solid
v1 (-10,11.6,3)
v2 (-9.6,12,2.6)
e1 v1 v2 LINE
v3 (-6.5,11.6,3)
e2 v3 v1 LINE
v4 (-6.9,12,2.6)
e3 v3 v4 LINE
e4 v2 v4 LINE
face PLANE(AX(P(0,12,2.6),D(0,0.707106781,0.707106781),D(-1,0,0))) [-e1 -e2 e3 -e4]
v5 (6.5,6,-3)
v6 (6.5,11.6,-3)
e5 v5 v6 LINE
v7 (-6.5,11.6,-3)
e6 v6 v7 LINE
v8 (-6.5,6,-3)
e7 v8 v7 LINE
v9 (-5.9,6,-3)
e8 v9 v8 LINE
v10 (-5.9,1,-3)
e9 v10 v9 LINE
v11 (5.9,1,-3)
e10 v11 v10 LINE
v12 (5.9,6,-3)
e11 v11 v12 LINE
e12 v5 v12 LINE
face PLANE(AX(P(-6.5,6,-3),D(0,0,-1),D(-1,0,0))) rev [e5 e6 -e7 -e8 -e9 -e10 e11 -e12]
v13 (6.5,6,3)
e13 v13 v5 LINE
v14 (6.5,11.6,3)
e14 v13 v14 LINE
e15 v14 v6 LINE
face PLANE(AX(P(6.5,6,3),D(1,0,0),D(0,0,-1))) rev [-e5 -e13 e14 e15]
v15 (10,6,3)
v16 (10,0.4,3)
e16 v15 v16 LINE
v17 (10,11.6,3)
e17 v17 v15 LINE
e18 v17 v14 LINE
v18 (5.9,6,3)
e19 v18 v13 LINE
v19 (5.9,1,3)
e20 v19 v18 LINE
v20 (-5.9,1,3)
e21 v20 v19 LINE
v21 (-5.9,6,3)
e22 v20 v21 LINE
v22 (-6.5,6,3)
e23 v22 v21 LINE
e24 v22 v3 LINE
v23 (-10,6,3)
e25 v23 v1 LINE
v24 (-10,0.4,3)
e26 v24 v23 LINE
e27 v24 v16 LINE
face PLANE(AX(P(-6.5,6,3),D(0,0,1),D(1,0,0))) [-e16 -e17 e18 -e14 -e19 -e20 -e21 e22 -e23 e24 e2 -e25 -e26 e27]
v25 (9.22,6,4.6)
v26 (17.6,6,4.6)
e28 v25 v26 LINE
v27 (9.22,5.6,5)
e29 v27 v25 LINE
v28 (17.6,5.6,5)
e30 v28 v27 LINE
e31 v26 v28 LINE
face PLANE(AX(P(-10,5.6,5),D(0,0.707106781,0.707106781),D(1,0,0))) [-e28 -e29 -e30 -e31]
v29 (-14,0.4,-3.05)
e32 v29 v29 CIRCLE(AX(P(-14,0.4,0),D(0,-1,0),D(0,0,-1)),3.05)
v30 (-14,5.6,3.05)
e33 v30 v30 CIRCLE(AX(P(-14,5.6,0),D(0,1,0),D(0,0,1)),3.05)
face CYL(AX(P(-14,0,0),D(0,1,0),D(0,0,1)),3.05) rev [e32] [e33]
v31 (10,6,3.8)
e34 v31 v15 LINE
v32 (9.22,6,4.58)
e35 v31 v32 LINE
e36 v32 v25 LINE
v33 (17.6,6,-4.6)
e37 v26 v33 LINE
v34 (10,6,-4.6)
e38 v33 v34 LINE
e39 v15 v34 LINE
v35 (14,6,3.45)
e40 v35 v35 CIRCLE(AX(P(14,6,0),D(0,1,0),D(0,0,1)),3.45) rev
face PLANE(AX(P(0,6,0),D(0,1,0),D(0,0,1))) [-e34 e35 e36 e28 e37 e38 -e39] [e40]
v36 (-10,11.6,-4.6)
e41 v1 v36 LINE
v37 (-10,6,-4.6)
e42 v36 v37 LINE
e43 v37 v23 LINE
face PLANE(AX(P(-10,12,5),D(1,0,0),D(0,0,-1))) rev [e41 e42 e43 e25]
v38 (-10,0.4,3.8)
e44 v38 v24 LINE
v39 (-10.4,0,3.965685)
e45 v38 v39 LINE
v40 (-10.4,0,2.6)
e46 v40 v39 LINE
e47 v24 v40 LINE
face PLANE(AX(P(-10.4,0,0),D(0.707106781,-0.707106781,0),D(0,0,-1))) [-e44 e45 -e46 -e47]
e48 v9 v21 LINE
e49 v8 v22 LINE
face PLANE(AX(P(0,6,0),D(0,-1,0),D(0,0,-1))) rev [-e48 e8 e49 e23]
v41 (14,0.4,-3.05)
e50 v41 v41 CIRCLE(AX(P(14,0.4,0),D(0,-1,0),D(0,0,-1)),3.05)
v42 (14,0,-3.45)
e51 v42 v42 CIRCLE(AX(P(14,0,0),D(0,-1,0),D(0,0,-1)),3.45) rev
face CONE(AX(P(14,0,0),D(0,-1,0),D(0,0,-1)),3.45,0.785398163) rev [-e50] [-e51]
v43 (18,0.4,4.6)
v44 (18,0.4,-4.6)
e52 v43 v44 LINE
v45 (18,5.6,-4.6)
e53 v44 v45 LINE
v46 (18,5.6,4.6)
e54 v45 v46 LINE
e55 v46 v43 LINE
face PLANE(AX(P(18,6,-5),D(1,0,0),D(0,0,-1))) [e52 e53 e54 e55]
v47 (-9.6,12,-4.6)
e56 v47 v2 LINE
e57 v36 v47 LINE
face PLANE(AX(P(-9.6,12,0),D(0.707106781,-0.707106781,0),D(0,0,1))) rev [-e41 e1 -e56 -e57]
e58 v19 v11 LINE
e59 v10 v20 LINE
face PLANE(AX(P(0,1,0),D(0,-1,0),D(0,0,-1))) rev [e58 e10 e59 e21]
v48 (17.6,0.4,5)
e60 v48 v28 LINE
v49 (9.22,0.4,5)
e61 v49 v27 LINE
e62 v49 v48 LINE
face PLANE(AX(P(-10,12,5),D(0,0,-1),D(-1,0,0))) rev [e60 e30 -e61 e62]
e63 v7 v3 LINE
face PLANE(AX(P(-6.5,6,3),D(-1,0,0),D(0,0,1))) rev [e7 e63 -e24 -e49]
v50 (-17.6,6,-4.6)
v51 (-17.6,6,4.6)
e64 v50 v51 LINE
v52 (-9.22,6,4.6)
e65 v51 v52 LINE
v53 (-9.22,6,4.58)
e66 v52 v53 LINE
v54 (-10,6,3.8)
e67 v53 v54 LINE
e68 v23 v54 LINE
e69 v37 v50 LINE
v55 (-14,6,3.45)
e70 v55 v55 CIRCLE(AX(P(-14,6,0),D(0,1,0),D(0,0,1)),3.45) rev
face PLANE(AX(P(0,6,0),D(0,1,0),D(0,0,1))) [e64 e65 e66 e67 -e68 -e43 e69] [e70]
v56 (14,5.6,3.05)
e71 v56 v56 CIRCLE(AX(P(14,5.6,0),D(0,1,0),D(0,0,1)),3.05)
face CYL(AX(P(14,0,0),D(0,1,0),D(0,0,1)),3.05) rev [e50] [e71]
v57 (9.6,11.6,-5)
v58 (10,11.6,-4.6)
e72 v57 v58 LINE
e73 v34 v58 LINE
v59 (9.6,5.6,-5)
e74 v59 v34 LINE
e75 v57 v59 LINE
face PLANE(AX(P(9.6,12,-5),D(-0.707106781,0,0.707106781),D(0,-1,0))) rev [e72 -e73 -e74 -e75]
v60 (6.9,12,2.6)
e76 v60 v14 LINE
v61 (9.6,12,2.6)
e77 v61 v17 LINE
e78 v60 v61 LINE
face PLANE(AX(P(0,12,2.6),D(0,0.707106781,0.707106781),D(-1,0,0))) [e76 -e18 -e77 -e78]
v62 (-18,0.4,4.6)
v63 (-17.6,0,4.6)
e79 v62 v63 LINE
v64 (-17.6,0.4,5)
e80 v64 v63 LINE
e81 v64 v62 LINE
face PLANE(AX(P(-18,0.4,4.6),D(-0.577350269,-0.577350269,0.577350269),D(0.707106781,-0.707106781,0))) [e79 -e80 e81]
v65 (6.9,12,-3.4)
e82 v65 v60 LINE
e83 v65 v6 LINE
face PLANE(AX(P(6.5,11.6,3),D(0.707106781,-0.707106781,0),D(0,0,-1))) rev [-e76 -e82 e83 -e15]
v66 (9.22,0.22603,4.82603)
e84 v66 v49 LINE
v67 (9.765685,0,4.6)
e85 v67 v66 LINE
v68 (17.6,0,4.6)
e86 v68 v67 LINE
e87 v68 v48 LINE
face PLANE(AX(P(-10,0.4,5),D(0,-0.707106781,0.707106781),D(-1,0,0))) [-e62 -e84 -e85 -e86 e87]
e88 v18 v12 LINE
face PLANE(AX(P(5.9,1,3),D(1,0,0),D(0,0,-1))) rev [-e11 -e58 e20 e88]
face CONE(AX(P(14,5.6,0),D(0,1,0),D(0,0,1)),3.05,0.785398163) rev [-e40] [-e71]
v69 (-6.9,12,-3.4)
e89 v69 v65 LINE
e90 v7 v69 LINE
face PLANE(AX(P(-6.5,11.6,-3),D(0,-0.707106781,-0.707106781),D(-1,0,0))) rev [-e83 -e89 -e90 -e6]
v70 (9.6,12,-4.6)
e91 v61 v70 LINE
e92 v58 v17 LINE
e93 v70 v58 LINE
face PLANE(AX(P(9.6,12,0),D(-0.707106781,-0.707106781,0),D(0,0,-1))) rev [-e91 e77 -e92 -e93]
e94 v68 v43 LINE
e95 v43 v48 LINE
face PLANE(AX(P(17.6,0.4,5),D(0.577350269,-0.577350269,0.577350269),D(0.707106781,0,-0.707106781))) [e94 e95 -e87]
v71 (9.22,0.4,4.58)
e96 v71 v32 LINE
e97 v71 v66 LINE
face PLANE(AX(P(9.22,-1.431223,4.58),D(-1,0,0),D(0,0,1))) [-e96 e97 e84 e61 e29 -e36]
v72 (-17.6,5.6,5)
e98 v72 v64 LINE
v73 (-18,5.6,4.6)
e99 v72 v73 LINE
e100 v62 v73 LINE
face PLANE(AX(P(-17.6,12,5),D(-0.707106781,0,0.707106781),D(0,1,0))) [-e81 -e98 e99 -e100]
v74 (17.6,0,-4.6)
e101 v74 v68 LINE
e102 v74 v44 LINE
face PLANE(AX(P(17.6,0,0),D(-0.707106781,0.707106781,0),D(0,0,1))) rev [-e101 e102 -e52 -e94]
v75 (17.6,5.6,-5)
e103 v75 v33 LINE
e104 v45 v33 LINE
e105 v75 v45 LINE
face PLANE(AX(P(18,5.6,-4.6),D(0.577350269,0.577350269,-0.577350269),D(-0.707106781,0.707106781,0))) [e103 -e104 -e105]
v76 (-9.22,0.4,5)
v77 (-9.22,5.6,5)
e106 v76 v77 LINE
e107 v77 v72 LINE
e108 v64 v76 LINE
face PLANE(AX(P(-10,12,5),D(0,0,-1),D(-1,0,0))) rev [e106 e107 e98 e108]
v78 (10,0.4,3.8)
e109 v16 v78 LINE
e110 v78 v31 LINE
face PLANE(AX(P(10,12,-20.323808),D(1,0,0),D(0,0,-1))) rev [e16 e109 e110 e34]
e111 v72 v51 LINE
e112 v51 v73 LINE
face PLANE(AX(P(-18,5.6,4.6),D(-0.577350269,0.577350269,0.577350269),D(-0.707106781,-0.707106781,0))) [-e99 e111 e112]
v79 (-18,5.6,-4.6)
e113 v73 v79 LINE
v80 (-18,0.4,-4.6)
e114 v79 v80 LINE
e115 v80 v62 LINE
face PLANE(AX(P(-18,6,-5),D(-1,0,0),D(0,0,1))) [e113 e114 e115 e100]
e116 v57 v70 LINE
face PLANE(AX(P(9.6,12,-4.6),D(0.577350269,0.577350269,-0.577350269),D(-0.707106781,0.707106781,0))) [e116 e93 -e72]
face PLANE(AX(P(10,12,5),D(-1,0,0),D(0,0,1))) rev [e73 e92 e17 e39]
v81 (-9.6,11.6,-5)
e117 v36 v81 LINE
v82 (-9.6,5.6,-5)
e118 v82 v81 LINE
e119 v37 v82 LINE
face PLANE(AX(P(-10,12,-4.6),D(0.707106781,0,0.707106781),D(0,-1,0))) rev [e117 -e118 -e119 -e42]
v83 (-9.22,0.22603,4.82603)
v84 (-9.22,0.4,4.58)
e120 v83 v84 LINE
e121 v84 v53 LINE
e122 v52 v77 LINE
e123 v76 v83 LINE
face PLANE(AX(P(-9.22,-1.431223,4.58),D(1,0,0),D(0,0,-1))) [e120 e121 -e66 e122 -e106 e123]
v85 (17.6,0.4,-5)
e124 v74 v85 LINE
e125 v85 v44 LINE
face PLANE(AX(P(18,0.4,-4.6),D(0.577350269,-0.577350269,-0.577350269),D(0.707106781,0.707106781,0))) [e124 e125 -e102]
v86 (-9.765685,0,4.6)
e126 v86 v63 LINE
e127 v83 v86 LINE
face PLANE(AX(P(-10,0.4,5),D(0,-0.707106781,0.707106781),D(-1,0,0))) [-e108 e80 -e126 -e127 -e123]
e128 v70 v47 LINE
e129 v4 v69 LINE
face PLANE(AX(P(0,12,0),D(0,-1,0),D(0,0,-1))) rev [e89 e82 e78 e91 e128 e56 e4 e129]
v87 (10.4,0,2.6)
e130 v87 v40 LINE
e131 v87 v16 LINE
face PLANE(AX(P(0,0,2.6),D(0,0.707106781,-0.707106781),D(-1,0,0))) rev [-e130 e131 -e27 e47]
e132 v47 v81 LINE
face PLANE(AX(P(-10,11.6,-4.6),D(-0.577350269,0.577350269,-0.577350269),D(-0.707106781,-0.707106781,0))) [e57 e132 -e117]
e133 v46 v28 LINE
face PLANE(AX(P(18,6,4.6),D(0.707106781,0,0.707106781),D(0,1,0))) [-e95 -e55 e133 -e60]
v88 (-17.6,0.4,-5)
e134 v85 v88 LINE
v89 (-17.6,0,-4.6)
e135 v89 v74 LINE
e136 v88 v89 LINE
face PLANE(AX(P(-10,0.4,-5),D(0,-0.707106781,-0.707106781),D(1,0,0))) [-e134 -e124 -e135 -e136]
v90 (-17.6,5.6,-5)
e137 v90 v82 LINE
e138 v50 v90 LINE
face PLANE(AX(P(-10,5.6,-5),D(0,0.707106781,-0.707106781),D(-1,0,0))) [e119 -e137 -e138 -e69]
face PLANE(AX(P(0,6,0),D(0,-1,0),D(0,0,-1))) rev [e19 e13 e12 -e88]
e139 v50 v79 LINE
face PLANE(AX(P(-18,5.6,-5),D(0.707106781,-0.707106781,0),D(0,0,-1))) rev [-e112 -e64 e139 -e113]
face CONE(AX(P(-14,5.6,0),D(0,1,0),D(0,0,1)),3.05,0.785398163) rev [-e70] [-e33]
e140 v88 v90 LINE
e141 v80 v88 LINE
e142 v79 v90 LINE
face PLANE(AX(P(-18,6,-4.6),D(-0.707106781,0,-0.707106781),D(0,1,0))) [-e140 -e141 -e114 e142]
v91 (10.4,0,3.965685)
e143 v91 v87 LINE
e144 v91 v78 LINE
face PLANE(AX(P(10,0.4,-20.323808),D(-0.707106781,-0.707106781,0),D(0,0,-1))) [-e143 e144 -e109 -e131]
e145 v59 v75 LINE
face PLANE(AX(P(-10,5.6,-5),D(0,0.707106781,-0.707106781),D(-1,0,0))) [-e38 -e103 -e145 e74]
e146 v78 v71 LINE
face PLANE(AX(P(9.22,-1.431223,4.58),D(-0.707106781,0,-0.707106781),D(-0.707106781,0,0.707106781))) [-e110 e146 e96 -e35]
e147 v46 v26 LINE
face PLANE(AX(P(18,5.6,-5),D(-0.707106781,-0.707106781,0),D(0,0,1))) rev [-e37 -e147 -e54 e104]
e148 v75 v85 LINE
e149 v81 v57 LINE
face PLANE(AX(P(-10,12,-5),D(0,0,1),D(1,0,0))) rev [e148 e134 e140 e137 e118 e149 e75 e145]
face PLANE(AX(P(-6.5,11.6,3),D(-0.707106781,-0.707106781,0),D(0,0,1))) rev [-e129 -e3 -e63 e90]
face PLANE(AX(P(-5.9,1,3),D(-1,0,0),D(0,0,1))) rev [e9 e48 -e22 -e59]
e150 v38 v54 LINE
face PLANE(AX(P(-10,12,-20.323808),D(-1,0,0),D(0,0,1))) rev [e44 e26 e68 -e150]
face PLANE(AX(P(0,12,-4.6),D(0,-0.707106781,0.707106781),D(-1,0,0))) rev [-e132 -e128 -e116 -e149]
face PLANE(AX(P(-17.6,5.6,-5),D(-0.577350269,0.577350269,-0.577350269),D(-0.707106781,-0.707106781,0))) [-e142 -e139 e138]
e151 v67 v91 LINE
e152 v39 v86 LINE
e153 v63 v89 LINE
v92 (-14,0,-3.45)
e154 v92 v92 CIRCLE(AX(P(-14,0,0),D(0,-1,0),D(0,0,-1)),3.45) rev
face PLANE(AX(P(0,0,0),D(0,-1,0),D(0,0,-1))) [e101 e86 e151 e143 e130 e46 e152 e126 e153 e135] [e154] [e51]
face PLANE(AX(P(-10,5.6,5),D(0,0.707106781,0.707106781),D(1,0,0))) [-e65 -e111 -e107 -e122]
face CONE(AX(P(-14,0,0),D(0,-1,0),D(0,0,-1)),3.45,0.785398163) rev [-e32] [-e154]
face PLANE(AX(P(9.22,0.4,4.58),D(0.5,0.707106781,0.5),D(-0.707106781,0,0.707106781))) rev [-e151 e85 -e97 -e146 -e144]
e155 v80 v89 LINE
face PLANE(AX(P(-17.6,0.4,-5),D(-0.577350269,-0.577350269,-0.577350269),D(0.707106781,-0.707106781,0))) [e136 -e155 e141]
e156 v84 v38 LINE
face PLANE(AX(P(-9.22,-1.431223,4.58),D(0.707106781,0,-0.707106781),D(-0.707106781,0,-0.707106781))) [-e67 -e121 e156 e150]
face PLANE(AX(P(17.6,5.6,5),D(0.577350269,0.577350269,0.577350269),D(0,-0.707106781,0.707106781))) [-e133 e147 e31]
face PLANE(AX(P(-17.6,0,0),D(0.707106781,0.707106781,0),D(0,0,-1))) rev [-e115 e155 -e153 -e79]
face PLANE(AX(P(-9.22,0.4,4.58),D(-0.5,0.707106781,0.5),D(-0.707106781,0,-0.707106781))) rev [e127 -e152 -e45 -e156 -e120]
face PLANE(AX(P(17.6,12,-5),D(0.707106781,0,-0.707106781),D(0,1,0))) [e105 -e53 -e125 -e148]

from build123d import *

# Parameters (mm, degrees)
SKETCH1_W           = 20
SKETCH1_H           = 10
BOSS_EXTRUDE1_DEPTH = 12
SKETCH2_W           = 36
SKETCH2_H           = 10
BOSS_EXTRUDE2_DEPTH = 6
SKETCH3_R           = 3.05
CUT_EXTRUDE1_DEPTH  = 20.62141687
SKETCH4_W           = 13
SKETCH4_H           = 6
CUT_EXTRUDE2_DEPTH  = 6
SKETCH5_W           = 20
SKETCH5_H           = 12
CUT_EXTRUDE3_DEPTH  = 2
SKETCH6_W           = 11.8
SKETCH6_H           = 6
CUT_EXTRUDE4_DEPTH  = 5
BOSS_EXTRUDE3_DEPTH = 6


with BuildPart() as part:
    # Sketch1 → Boss-Extrude1 (new body)
    with BuildSketch(Plane(origin=(0, 0, 0), x_dir=(1, 0, 0), z_dir=(0, 1, 0))):
        Rectangle(SKETCH1_W, SKETCH1_H)
    extrude(amount=BOSS_EXTRUDE1_DEPTH)

    # Sketch2 → Boss-Extrude2 (add)
    with BuildSketch(Plane.XZ):
        Rectangle(SKETCH2_W, SKETCH2_H)
    extrude(amount=-BOSS_EXTRUDE2_DEPTH)

    # Sketch3 → Cut-Extrude1 (cut, through all)
    with BuildSketch(Plane(origin=(0, 6, 0), x_dir=(1, 0, 0), z_dir=(0, 1, 0))):
        with Locations(Location((-14, 0, 0), (0, 0, 270))):
            Circle(SKETCH3_R)
        with Locations(Location((14, 0, 0), (0, 0, 270))):
            Circle(SKETCH3_R)
    extrude(amount=-CUT_EXTRUDE1_DEPTH, mode=Mode.SUBTRACT)

    # Sketch4 → Cut-Extrude2 (cut)
    with BuildSketch(Plane(origin=(0, 12, 0), x_dir=(1, 0, 0), z_dir=(0, 1, 0))):
        Rectangle(SKETCH4_W, SKETCH4_H)
    extrude(amount=-CUT_EXTRUDE2_DEPTH, mode=Mode.SUBTRACT)

    # Sketch5 → Cut-Extrude3 (cut)
    with BuildSketch(Plane.XY.offset(5)):
        with Locations((0, 6)):
            Rectangle(SKETCH5_W, SKETCH5_H)
    extrude(amount=-CUT_EXTRUDE3_DEPTH, mode=Mode.SUBTRACT)

    # Sketch6 → Cut-Extrude4 (cut)
    with BuildSketch(Plane(origin=(0, 6, 0), x_dir=(1, 0, 0), z_dir=(0, 1, 0))):
        Rectangle(SKETCH6_W, SKETCH6_H)
    extrude(amount=-CUT_EXTRUDE4_DEPTH, mode=Mode.SUBTRACT)

    # Sketch7 → Boss-Extrude3 (add)
    with BuildSketch(Plane(origin=(0, 6, 0), x_dir=(1, 0, 0), z_dir=(0, 1, 0))):
        Polygon((-10, -5), (-9.22, -5), (-9.22, -4.58), (-10, -3.8), align=None)
        Polygon((10, -3.8), (10, -5), (9.22, -5), (9.22, -4.58), align=None)
    extrude(amount=-BOSS_EXTRUDE3_DEPTH)

    # Chamfer1
    # the kernel refuses this chamfer: 0.4 mm, written as the material it takes off along each edge
    with BuildSketch(Plane(origin=(17.733333333, 5.733333333, 4.733333333), x_dir=(0.7071067811865491, 0, -0.7071067811865459), z_dir=(0.5773502691896257, 0.5773502691896232, 0.5773502691896283)), Plane(origin=(17.733333333, 5.733333333, -4.733333333), x_dir=(-0.7071067811865444, 0, -0.7071067811865506), z_dir=(0.5773502691896283, 0.5773502691896257, -0.5773502691896232)), Plane(origin=(-17.733333333, 0.266666667, 4.733333333), x_dir=(-0.707106781186546, 0, -0.7071067811865491), z_dir=(-0.5773502691896272, -0.5773502691896252, 0.5773502691896248))) as chamfer1_piece_1:
        Polygon((-0.282842712, -0.163299316), (0.282842712, -0.163299316), (0, 0.326598632), align=None)
    extrude(amount=0.508068237, mode=Mode.SUBTRACT)
    with BuildSketch(Plane(origin=(17.733333333, 0.266666667, 4.733333333), x_dir=(-6.2803698347350965e-15, 0.7071067811865472, 0.7071067811865478), z_dir=(0.5773502691896255, -0.5773502691896235, 0.5773502691896282)), Plane(origin=(17.733333333, 0.266666667, -4.733333333), x_dir=(0.7071067811865462, 0.7071067811865488, 0), z_dir=(0.5773502691896282, -0.5773502691896261, -0.5773502691896231)), Plane(origin=(-17.733333333, 0.266666667, -4.733333333), x_dir=(0.7071067811865462, -0.7071067811865488, 0), z_dir=(-0.5773502691896264, -0.5773502691896244, -0.5773502691896264)), Plane(origin=(-17.733333333, 5.733333333, 4.733333333), x_dir=(0, -0.7071067811865475, 0.7071067811865475), z_dir=(-0.5773502691896275, 0.577350269189625, 0.577350269189625)), Plane(origin=(-17.733333333, 5.733333333, -4.733333333), x_dir=(-0.707106781186546, -0.7071067811865491, 0), z_dir=(-0.5773502691896266, 0.577350269189624, -0.5773502691896266)), Plane(origin=(-9.733333333, 11.733333333, -4.733333333), x_dir=(-0.7071067811865475, -0.7071067811865475, 0), z_dir=(-0.577350269189625, 0.577350269189625, -0.5773502691896275)), Plane(origin=(9.733333333, 11.733333333, -4.733333333), x_dir=(0, -0.7071067811865475, -0.7071067811865475), z_dir=(0.5773502691896257, 0.5773502691896257, -0.5773502691896257))) as chamfer1_piece_2:
        Polygon((-0.282842712, 0.163299316), (0.282842712, 0.163299316), (0, -0.326598632), align=None)
    extrude(amount=0.508068237, mode=Mode.SUBTRACT)
    with BuildSketch(Plane(origin=(14, 0, 0), x_dir=(0, 0, 1), z_dir=(-1, 0, 0))) as chamfer1_piece_3:
        with BuildLine():
            Line((3.038686292, 0.411313708), (3.461313708, -0.011313708))
            Line((3.461313708, -0.011313708), (3.461313708, -0.019313708))
            ThreePointArc((3.461313708, -0.019313708), (3.255656854, -0.008), (3.05, -0.008))
            Line((3.05, -0.008), (3.042, 0))
            ThreePointArc((3.042, 0), (3.042, 0.205656854), (3.030686292, 0.411313708))
            Line((3.030686292, 0.411313708), (3.038686292, 0.411313708))
        make_face()
    revolve(axis=Axis((14, 0, 0), (0, 1, 0)), mode=Mode.SUBTRACT)
    with BuildSketch(Plane(origin=(14, 6, 0), x_dir=(0, 0, 1), z_dir=(-1, 0, 0))) as chamfer1_piece_4:
        with BuildLine():
            Line((3.461313708, 0.011313708), (3.038686292, -0.411313708))
            Line((3.038686292, -0.411313708), (3.030686292, -0.411313708))
            ThreePointArc((3.030686292, -0.411313708), (3.042, -0.205656854), (3.042, 0))
            Line((3.042, 0), (3.05, 0.008))
            ThreePointArc((3.05, 0.008), (3.255656854, 0.008), (3.461313708, 0.019313708))
            Line((3.461313708, 0.019313708), (3.461313708, 0.011313708))
        make_face()
    revolve(axis=Axis((14, 6, 0), (0, 1, 0)), mode=Mode.SUBTRACT)
    with BuildSketch(Plane(origin=(-14, 0, 0), x_dir=(0, 0, 1), z_dir=(-1, 0, 0))) as chamfer1_piece_5:
        with BuildLine():
            Line((3.038686292, 0.411313708), (3.461313708, -0.011313708))
            Line((3.461313708, -0.011313708), (3.461313708, -0.019313708))
            ThreePointArc((3.461313708, -0.019313708), (3.255656854, -0.008), (3.05, -0.008))
            Line((3.05, -0.008), (3.042, 0))
            ThreePointArc((3.042, 0), (3.042, 0.205656854), (3.030686292, 0.411313708))
            Line((3.030686292, 0.411313708), (3.038686292, 0.411313708))
        make_face()
    revolve(axis=Axis((-14, 0, 0), (0, 1, 0)), mode=Mode.SUBTRACT)
    with BuildSketch(Plane(origin=(-14, 6, 0), x_dir=(0, 0, 1), z_dir=(-1, 0, 0))) as chamfer1_piece_6:
        with BuildLine():
            Line((3.461313708, 0.011313708), (3.038686292, -0.411313708))
            Line((3.038686292, -0.411313708), (3.030686292, -0.411313708))
            ThreePointArc((3.030686292, -0.411313708), (3.042, -0.205656854), (3.042, 0))
            Line((3.042, 0), (3.05, 0.008))
            ThreePointArc((3.05, 0.008), (3.255656854, 0.008), (3.461313708, 0.019313708))
            Line((3.461313708, 0.019313708), (3.461313708, 0.011313708))
        make_face()
    revolve(axis=Axis((-14, 6, 0), (0, 1, 0)), mode=Mode.SUBTRACT)
    with BuildSketch(Plane(origin=(10, 0, 3), x_dir=(0, 0.9996219169112968, 0.02749587661058625), z_dir=(-1, 0, 0))) as chamfer1_piece_7:
        with BuildLine():
            Line((0.411469278, 0), (-0.022618862, 0.410847117))
            Line((-0.022618862, 0.410847117), (-0.030615837, 0.41062715))
            ThreePointArc((-0.030615837, 0.41062715), (-0.013651691, 0.205359132), (-0.007996975, -0.000219967))
            Line((-0.007996975, -0.000219967), (0.000219967, -0.007996975))
            ThreePointArc((0.000219967, -0.007996975), (0.205799066, -0.00234226), (0.411689245, -0.007996975))
            Line((0.411689245, -0.007996975), (0.411469278, 0))
        make_face()
    extrude(amount=20, mode=Mode.SUBTRACT)
    with BuildSketch(Plane(origin=(10, 0, 4.828673195), x_dir=(-0.027495876610587326, 0.9996219169112966, 0), z_dir=(0, 0, -1))) as chamfer1_piece_8_section:
        with BuildLine():
            Line((0.411469278, 0), (-0.022618862, 0.410847117))
            Line((-0.022618862, 0.410847117), (-0.030615837, 0.41062715))
            ThreePointArc((-0.030615837, 0.41062715), (-0.013651691, 0.205359132), (-0.007996975, -0.000219967))
            Line((-0.007996975, -0.000219967), (0.000219967, -0.007996975))
            ThreePointArc((0.000219967, -0.007996975), (0.205799066, -0.00234226), (0.411689245, -0.007996975))
            Line((0.411689245, -0.007996975), (0.411469278, 0))
        make_face()
    chamfer1_piece_8 = extrude(amount=1.828673195, mode=Mode.PRIVATE)
    chamfer1_piece_8 = split(chamfer1_piece_8, bisect_by=Plane(origin=(10.287531855, 0.140047879, 3.512468145), z_dir=(-0.7071067811865437, 0, -0.7071067811865513)), keep=Keep.TOP, mode=Mode.PRIVATE)
    add(chamfer1_piece_8, mode=Mode.SUBTRACT)
    with BuildSketch(Plane(origin=(8.492618208, 0, 5.307381792), x_dir=(-0.019442520806013025, 0.9996219169112968, -0.019442520806013233), z_dir=(0.7071067811865513, 0, -0.7071067811865437))) as chamfer1_piece_9_section:
        with BuildLine():
            Line((0.411469278, 0), (-0.022618862, 0.410847117))
            Line((-0.022618862, 0.410847117), (-0.030615837, 0.41062715))
            ThreePointArc((-0.030615837, 0.41062715), (-0.013651691, 0.205359132), (-0.007996975, -0.000219967))
            Line((-0.007996975, -0.000219967), (0.000219967, -0.007996975))
            ThreePointArc((0.000219967, -0.007996975), (0.205799066, -0.00234226), (0.411689245, -0.007996975))
            Line((0.411689245, -0.007996975), (0.411469278, 0))
        make_face()
    chamfer1_piece_9 = extrude(amount=3.160432969, mode=Mode.PRIVATE)
    chamfer1_piece_9 = split(chamfer1_piece_9, bisect_by=Plane(origin=(10, 0.134633563, 4.688221688), z_dir=(-1, 0, 0)), keep=Keep.TOP, mode=Mode.PRIVATE)
    add(chamfer1_piece_9, mode=Mode.SUBTRACT)
    with BuildSketch(Plane(origin=(19.028673195, 6, 5), x_dir=(0, 0.027495876610587302, -0.9996219169112966), z_dir=(-1, 0, 0)), Plane(origin=(19.028673195, 0, 5), x_dir=(0, 0.9996219169112966, 0.02749587661058735), z_dir=(-1, 0, 0))) as chamfer1_piece_10:
        with BuildLine():
            Line((0.411469278, 0), (-0.022618862, 0.410847117))
            Line((-0.022618862, 0.410847117), (-0.030615837, 0.41062715))
            ThreePointArc((-0.030615837, 0.41062715), (-0.013651691, 0.205359132), (-0.007996975, -0.000219967))
            Line((-0.007996975, -0.000219967), (0.000219967, -0.007996975))
            ThreePointArc((0.000219967, -0.007996975), (0.205799066, -0.00234226), (0.411689245, -0.007996975))
            Line((0.411689245, -0.007996975), (0.411469278, 0))
        make_face()
    extrude(amount=10.83734639, mode=Mode.SUBTRACT)
    with BuildSketch(Plane(origin=(18, 0, -6.028673195), x_dir=(0.02749587661058735, 0.9996219169112966, 0), z_dir=(0, 0, 1)), Plane(origin=(18, 6, -6.028673195), x_dir=(-0.9996219169112966, 0.02749587661058742, 0), z_dir=(0, 0, 1)), Plane(origin=(-18, 0, 6.028673195), x_dir=(-0.02749587661058735, 0.9996219169112966, 0), z_dir=(0, 0, -1)), Plane(origin=(-18, 6, 6.028673195), x_dir=(0.9996219169112966, 0.02749587661058742, 0), z_dir=(0, 0, -1))) as chamfer1_piece_11:
        with BuildLine():
            Line((0.411469278, 0), (-0.022618862, 0.410847117))
            Line((-0.022618862, 0.410847117), (-0.030615837, 0.41062715))
            ThreePointArc((-0.030615837, 0.41062715), (-0.013651691, 0.205359132), (-0.007996975, -0.000219967))
            Line((-0.007996975, -0.000219967), (0.000219967, -0.007996975))
            ThreePointArc((0.000219967, -0.007996975), (0.205799066, -0.00234226), (0.411689245, -0.007996975))
            Line((0.411689245, -0.007996975), (0.411469278, 0))
        make_face()
    extrude(amount=12.05734639, mode=Mode.SUBTRACT)
    with BuildSketch(Plane(origin=(-19.028673195, 0, -5), x_dir=(0, 0.9996219169112966, -0.02749587661058735), z_dir=(1, 0, 0))) as chamfer1_piece_12:
        with BuildLine():
            Line((0.411469278, 0), (-0.022618862, 0.410847117))
            Line((-0.022618862, 0.410847117), (-0.030615837, 0.41062715))
            ThreePointArc((-0.030615837, 0.41062715), (-0.013651691, 0.205359132), (-0.007996975, -0.000219967))
            Line((-0.007996975, -0.000219967), (0.000219967, -0.007996975))
            ThreePointArc((0.000219967, -0.007996975), (0.205799066, -0.00234226), (0.411689245, -0.007996975))
            Line((0.411689245, -0.007996975), (0.411469278, 0))
        make_face()
    extrude(amount=38.05734639, mode=Mode.SUBTRACT)
    with BuildSketch(Plane(origin=(-19.028673195, 0, 5), x_dir=(0, 0.9996219169112966, 0.02749587661058735), z_dir=(1, 0, 0)), Plane(origin=(-8.191326805, 6, 5), x_dir=(0, -0.9996219169112966, 0.027495876610587302), z_dir=(-1, 0, 0))) as chamfer1_piece_13:
        with BuildLine():
            Line((0.411469278, 0), (-0.022618862, -0.410847117))
            Line((-0.022618862, -0.410847117), (-0.030615837, -0.41062715))
            ThreePointArc((-0.030615837, -0.41062715), (-0.013651691, -0.205359132), (-0.007996975, 0.000219967))
            Line((-0.007996975, 0.000219967), (0.000219967, 0.007996975))
            ThreePointArc((0.000219967, 0.007996975), (0.205799066, 0.00234226), (0.411689245, 0.007996975))
            Line((0.411689245, 0.007996975), (0.411469278, 0))
        make_face()
    extrude(amount=10.83734639, mode=Mode.SUBTRACT)
    with BuildSketch(Plane(origin=(-8.492618208, 0, 5.307381792), x_dir=(0.019442520806011977, 0.9996219169112968, -0.019442520806012123), z_dir=(-0.7071067811865501, 0, -0.7071067811865449))) as chamfer1_piece_14_section:
        with BuildLine():
            Line((0.411469278, 0), (-0.022618862, -0.410847117))
            Line((-0.022618862, -0.410847117), (-0.030615837, -0.41062715))
            ThreePointArc((-0.030615837, -0.41062715), (-0.013651691, -0.205359132), (-0.007996975, 0.000219967))
            Line((-0.007996975, 0.000219967), (0.000219967, 0.007996975))
            ThreePointArc((0.000219967, 0.007996975), (0.205799066, 0.00234226), (0.411689245, 0.007996975))
            Line((0.411689245, 0.007996975), (0.411469278, 0))
        make_face()
    chamfer1_piece_14 = extrude(amount=3.160432969, mode=Mode.PRIVATE)
    chamfer1_piece_14 = split(chamfer1_piece_14, bisect_by=Plane(origin=(-10, 0.134633563, 4.688221688), z_dir=(1, 0, 0)), keep=Keep.TOP, mode=Mode.PRIVATE)
    add(chamfer1_piece_14, mode=Mode.SUBTRACT)
    with BuildSketch(Plane(origin=(-10, 0, 4.828673195), x_dir=(0.02749587661058735, 0.9996219169112966, 0), z_dir=(0, 0, -1))) as chamfer1_piece_15_section:
        with BuildLine():
            Line((0.411469278, 0), (-0.022618862, -0.410847117))
            Line((-0.022618862, -0.410847117), (-0.030615837, -0.41062715))
            ThreePointArc((-0.030615837, -0.41062715), (-0.013651691, -0.205359132), (-0.007996975, 0.000219967))
            Line((-0.007996975, 0.000219967), (0.000219967, 0.007996975))
            ThreePointArc((0.000219967, 0.007996975), (0.205799066, 0.00234226), (0.411689245, 0.007996975))
            Line((0.411689245, 0.007996975), (0.411469278, 0))
        make_face()
    chamfer1_piece_15 = extrude(amount=1.828673195, mode=Mode.PRIVATE)
    chamfer1_piece_15 = split(chamfer1_piece_15, bisect_by=Plane(origin=(-10.287531855, 0.140047879, 3.512468145), z_dir=(0.7071067811865449, 0, -0.7071067811865501)), keep=Keep.TOP, mode=Mode.PRIVATE)
    add(chamfer1_piece_15, mode=Mode.SUBTRACT)
    with BuildSketch(Plane(origin=(6.5, 12, 4.028673195), x_dir=(-0.027495876610587302, -0.9996219169112966, 0), z_dir=(0, 0, -1)), Plane(origin=(-6.5, 12, -3), x_dir=(0.027495876610587302, -0.9996219169112966, 0), z_dir=(0, 0, 1))) as chamfer1_piece_16:
        with BuildLine():
            Line((0.411469278, 0), (-0.022618862, -0.410847117))
            Line((-0.022618862, -0.410847117), (-0.030615837, -0.41062715))
            ThreePointArc((-0.030615837, -0.41062715), (-0.013651691, -0.205359132), (-0.007996975, 0.000219967))
            Line((-0.007996975, 0.000219967), (0.000219967, 0.007996975))
            ThreePointArc((0.000219967, 0.007996975), (0.205799066, 0.00234226), (0.411689245, 0.007996975))
            Line((0.411689245, 0.007996975), (0.411469278, 0))
        make_face()
    extrude(amount=7.028673195, mode=Mode.SUBTRACT)
    with BuildSketch(Plane(origin=(6.5, 12, -3), x_dir=(0, -0.9996219169112968, 0.027495876610586226), z_dir=(-1, 0, 0))) as chamfer1_piece_17:
        with BuildLine():
            Line((0.411469278, 0), (-0.022618862, -0.410847117))
            Line((-0.022618862, -0.410847117), (-0.030615837, -0.41062715))
            ThreePointArc((-0.030615837, -0.41062715), (-0.013651691, -0.205359132), (-0.007996975, 0.000219967))
            Line((-0.007996975, 0.000219967), (0.000219967, 0.007996975))
            ThreePointArc((0.000219967, 0.007996975), (0.205799066, 0.00234226), (0.411689245, 0.007996975))
            Line((0.411689245, 0.007996975), (0.411469278, 0))
        make_face()
    extrude(amount=13, mode=Mode.SUBTRACT)
    with BuildSketch(Plane(origin=(-11.028673195, 12, 3), x_dir=(0, -0.9996219169112968, 0.027495876610586226), z_dir=(1, 0, 0)), Plane(origin=(5.471326805, 12, 3), x_dir=(0, -0.9996219169112968, 0.027495876610586226), z_dir=(1, 0, 0))) as chamfer1_piece_18:
        with BuildLine():
            Line((0.411469278, 0), (-0.022618862, 0.410847117))
            Line((-0.022618862, 0.410847117), (-0.030615837, 0.41062715))
            ThreePointArc((-0.030615837, 0.41062715), (-0.013651691, 0.205359132), (-0.007996975, -0.000219967))
            Line((-0.007996975, -0.000219967), (0.000219967, -0.007996975))
            ThreePointArc((0.000219967, -0.007996975), (0.205799066, -0.00234226), (0.411689245, -0.007996975))
            Line((0.411689245, -0.007996975), (0.411469278, 0))
        make_face()
    extrude(amount=5.55734639, mode=Mode.SUBTRACT)
    with BuildSketch(Plane(origin=(-10, 12, -6.028673195), x_dir=(-0.027495876610587302, -0.9996219169112966, 0), z_dir=(0, 0, 1))) as chamfer1_piece_19:
        with BuildLine():
            Line((0.411469278, 0), (-0.022618862, 0.410847117))
            Line((-0.022618862, 0.410847117), (-0.030615837, 0.41062715))
            ThreePointArc((-0.030615837, 0.41062715), (-0.013651691, 0.205359132), (-0.007996975, -0.000219967))
            Line((-0.007996975, -0.000219967), (0.000219967, -0.007996975))
            ThreePointArc((0.000219967, -0.007996975), (0.205799066, -0.00234226), (0.411689245, -0.007996975))
            Line((0.411689245, -0.007996975), (0.411469278, 0))
        make_face()
    extrude(amount=10.05734639, mode=Mode.SUBTRACT)
    with BuildSketch(Plane(origin=(11.028673195, 12, -5), x_dir=(0, -0.9996219169112966, -0.027495876610587302), z_dir=(-1, 0, 0))) as chamfer1_piece_20:
        with BuildLine():
            Line((0.411469278, 0), (-0.022618862, 0.410847117))
            Line((-0.022618862, 0.410847117), (-0.030615837, 0.41062715))
            ThreePointArc((-0.030615837, 0.41062715), (-0.013651691, 0.205359132), (-0.007996975, -0.000219967))
            Line((-0.007996975, -0.000219967), (0.000219967, -0.007996975))
            ThreePointArc((0.000219967, -0.007996975), (0.205799066, -0.00234226), (0.411689245, -0.007996975))
            Line((0.411689245, -0.007996975), (0.411469278, 0))
        make_face()
    extrude(amount=22.05734639, mode=Mode.SUBTRACT)
    with BuildSketch(Plane(origin=(10, 12, 4.028673195), x_dir=(-0.9996219169112966, 0.027495876610587302, 0), z_dir=(0, 0, -1))) as chamfer1_piece_21:
        with BuildLine():
            Line((0.411469278, 0), (-0.022618862, -0.410847117))
            Line((-0.022618862, -0.410847117), (-0.030615837, -0.41062715))
            ThreePointArc((-0.030615837, -0.41062715), (-0.013651691, -0.205359132), (-0.007996975, 0.000219967))
            Line((-0.007996975, 0.000219967), (0.000219967, 0.007996975))
            ThreePointArc((0.000219967, 0.007996975), (0.205799066, 0.00234226), (0.411689245, 0.007996975))
            Line((0.411689245, 0.007996975), (0.411469278, 0))
        make_face()
    extrude(amount=10.05734639, mode=Mode.SUBTRACT)
    with BuildSketch(Plane(origin=(10, 6, -5), x_dir=(-0.9996219169112966, 0, -0.027495876610587302), z_dir=(0, 1, 0)), Plane(origin=(-10, 6, -5), x_dir=(-0.027495876610587302, 0, 0.9996219169112966), z_dir=(0, 1, 0))) as chamfer1_piece_22:
        with BuildLine():
            Line((0.411469278, 0), (-0.022618862, 0.410847117))
            Line((-0.022618862, 0.410847117), (-0.030615837, 0.41062715))
            ThreePointArc((-0.030615837, 0.41062715), (-0.013651691, 0.205359132), (-0.007996975, -0.000219967))
            Line((-0.007996975, -0.000219967), (0.000219967, -0.007996975))
            ThreePointArc((0.000219967, -0.007996975), (0.205799066, -0.00234226), (0.411689245, -0.007996975))
            Line((0.411689245, -0.007996975), (0.411469278, 0))
        make_face()
    extrude(amount=7.028673195, mode=Mode.SUBTRACT)
    with BuildSketch(Plane(origin=(10, 6, -5), x_dir=(0, -0.9996219169112966, -0.027495876610591618), z_dir=(1, 0, 0)), Plane(origin=(-19.028673195, 6, -5), x_dir=(0, -0.9996219169112966, -0.027495876610587302), z_dir=(1, 0, 0))) as chamfer1_piece_23:
        with BuildLine():
            Line((0.411469278, 0), (-0.022618862, -0.410847117))
            Line((-0.022618862, -0.410847117), (-0.030615837, -0.41062715))
            ThreePointArc((-0.030615837, -0.41062715), (-0.013651691, -0.205359132), (-0.007996975, 0.000219967))
            Line((-0.007996975, 0.000219967), (0.000219967, 0.007996975))
            ThreePointArc((0.000219967, 0.007996975), (0.205799066, 0.00234226), (0.411689245, 0.007996975))
            Line((0.411689245, 0.007996975), (0.411469278, 0))
        make_face()
    extrude(amount=9.028673195, mode=Mode.SUBTRACT)
    with BuildSketch(Plane(origin=(18, -1.028673195, 5), x_dir=(-0.9996219169112966, 0, 0.02749587661058742), z_dir=(0, 1, 0)), Plane(origin=(-18, -1.028673195, -5), x_dir=(0.9996219169112966, 0, -0.02749587661058742), z_dir=(0, 1, 0))) as chamfer1_piece_24:
        with BuildLine():
            Line((0.411469278, 0), (-0.022618862, -0.410847117))
            Line((-0.022618862, -0.410847117), (-0.030615837, -0.41062715))
            ThreePointArc((-0.030615837, -0.41062715), (-0.013651691, -0.205359132), (-0.007996975, 0.000219967))
            Line((-0.007996975, 0.000219967), (0.000219967, 0.007996975))
            ThreePointArc((0.000219967, 0.007996975), (0.205799066, 0.00234226), (0.411689245, 0.007996975))
            Line((0.411689245, 0.007996975), (0.411469278, 0))
        make_face()
    extrude(amount=8.05734639, mode=Mode.SUBTRACT)
    with BuildSketch(Plane(origin=(18, -1.028673195, -5), x_dir=(-0.9996219169112966, 0, -0.02749587661058742), z_dir=(0, 1, 0)), Plane(origin=(-18, -1.028673195, 5), x_dir=(0.9996219169112966, 0, 0.02749587661058742), z_dir=(0, 1, 0))) as chamfer1_piece_25:
        with BuildLine():
            Line((0.411469278, 0), (-0.022618862, 0.410847117))
            Line((-0.022618862, 0.410847117), (-0.030615837, 0.41062715))
            ThreePointArc((-0.030615837, 0.41062715), (-0.013651691, 0.205359132), (-0.007996975, -0.000219967))
            Line((-0.007996975, -0.000219967), (0.000219967, -0.007996975))
            ThreePointArc((0.000219967, -0.007996975), (0.205799066, -0.00234226), (0.411689245, -0.007996975))
            Line((0.411689245, -0.007996975), (0.411469278, 0))
        make_face()
    extrude(amount=8.05734639, mode=Mode.SUBTRACT)
    with BuildSketch(Plane(origin=(11.028673195, 0, 3), x_dir=(0, 0.9996219169112968, 0.02749587661058625), z_dir=(-1, 0, 0))) as chamfer1_piece_26a_section:
        with BuildLine():
            Line((0.411469278, 0), (-0.022618862, 0.410847117))
            Line((-0.022618862, 0.410847117), (-0.030615837, 0.41062715))
            ThreePointArc((-0.030615837, 0.41062715), (-0.013651691, 0.205359132), (-0.007996975, -0.000219967))
            Line((-0.007996975, -0.000219967), (0.000219967, -0.007996975))
            ThreePointArc((0.000219967, -0.007996975), (0.205799066, -0.00234226), (0.411689245, -0.007996975))
            Line((0.411689245, -0.007996975), (0.411469278, 0))
        make_face()
    chamfer1_piece_26a = extrude(amount=21.028673195, mode=Mode.PRIVATE)
    chamfer1_piece_26a = split(chamfer1_piece_26a, bisect_by=Plane(origin=(10, 0.131917451, 2.868082549), z_dir=(1, 0, 0)), keep=Keep.TOP, mode=Mode.PRIVATE)
    with BuildSketch(Plane(origin=(10, 0, 4.828673195), x_dir=(-0.027495876610587326, 0.9996219169112966, 0), z_dir=(0, 0, -1))) as chamfer1_piece_26b_section:
        with BuildLine():
            Line((0.411469278, 0), (-0.022618862, 0.410847117))
            Line((-0.022618862, 0.410847117), (-0.030615837, 0.41062715))
            ThreePointArc((-0.030615837, 0.41062715), (-0.013651691, 0.205359132), (-0.007996975, -0.000219967))
            Line((-0.007996975, -0.000219967), (0.000219967, -0.007996975))
            ThreePointArc((0.000219967, -0.007996975), (0.205799066, -0.00234226), (0.411689245, -0.007996975))
            Line((0.411689245, -0.007996975), (0.411469278, 0))
        make_face()
    chamfer1_piece_26b = extrude(amount=2.85734639, mode=Mode.PRIVATE)
    chamfer1_piece_26b = split(chamfer1_piece_26b, bisect_by=Plane(origin=(10.131917451, 0.131917451, 3), z_dir=(0, 0, -1)), keep=Keep.TOP, mode=Mode.PRIVATE)
    chamfer1_piece_26 = chamfer1_piece_26a & chamfer1_piece_26b
    add(chamfer1_piece_26, mode=Mode.SUBTRACT)
    with BuildSketch(Plane(origin=(-10, 0, 4.828673195), x_dir=(0.02749587661058735, 0.9996219169112966, 0), z_dir=(0, 0, -1))) as chamfer1_piece_27a_section:
        with BuildLine():
            Line((0.411469278, 0), (-0.022618862, -0.410847117))
            Line((-0.022618862, -0.410847117), (-0.030615837, -0.41062715))
            ThreePointArc((-0.030615837, -0.41062715), (-0.013651691, -0.205359132), (-0.007996975, 0.000219967))
            Line((-0.007996975, 0.000219967), (0.000219967, 0.007996975))
            ThreePointArc((0.000219967, 0.007996975), (0.205799066, 0.00234226), (0.411689245, 0.007996975))
            Line((0.411689245, 0.007996975), (0.411469278, 0))
        make_face()
    chamfer1_piece_27a = extrude(amount=2.85734639, mode=Mode.PRIVATE)
    chamfer1_piece_27a = split(chamfer1_piece_27a, bisect_by=Plane(origin=(-10.131917451, 0.131917451, 3), z_dir=(0, 0, -1)), keep=Keep.TOP, mode=Mode.PRIVATE)
    with BuildSketch(Plane(origin=(10, 0, 3), x_dir=(0, 0.9996219169112968, 0.02749587661058625), z_dir=(-1, 0, 0))) as chamfer1_piece_27b_section:
        with BuildLine():
            Line((0.411469278, 0), (-0.022618862, 0.410847117))
            Line((-0.022618862, 0.410847117), (-0.030615837, 0.41062715))
            ThreePointArc((-0.030615837, 0.41062715), (-0.013651691, 0.205359132), (-0.007996975, -0.000219967))
            Line((-0.007996975, -0.000219967), (0.000219967, -0.007996975))
            ThreePointArc((0.000219967, -0.007996975), (0.205799066, -0.00234226), (0.411689245, -0.007996975))
            Line((0.411689245, -0.007996975), (0.411469278, 0))
        make_face()
    chamfer1_piece_27b = extrude(amount=21.028673195, mode=Mode.PRIVATE)
    chamfer1_piece_27b = split(chamfer1_piece_27b, bisect_by=Plane(origin=(-10, 0.131917451, 2.868082549), z_dir=(-1, 0, 0)), keep=Keep.TOP, mode=Mode.PRIVATE)
    chamfer1_piece_27 = chamfer1_piece_27a & chamfer1_piece_27b
    add(chamfer1_piece_27, mode=Mode.SUBTRACT)
    with BuildSketch(Plane(origin=(8.492618208, 0, 5.307381792), x_dir=(-0.019442520806013025, 0.9996219169112968, -0.019442520806013233), z_dir=(0.7071067811865513, 0, -0.7071067811865437))) as chamfer1_piece_28a_section:
        with BuildLine():
            Line((0.411469278, 0), (-0.022618862, 0.410847117))
            Line((-0.022618862, 0.410847117), (-0.030615837, 0.41062715))
            ThreePointArc((-0.030615837, 0.41062715), (-0.013651691, 0.205359132), (-0.007996975, -0.000219967))
            Line((-0.007996975, -0.000219967), (0.000219967, -0.007996975))
            ThreePointArc((0.000219967, -0.007996975), (0.205799066, -0.00234226), (0.411689245, -0.007996975))
            Line((0.411689245, -0.007996975), (0.411469278, 0))
        make_face()
    chamfer1_piece_28a = extrude(amount=3.160432969, mode=Mode.PRIVATE)
    chamfer1_piece_28a = split(chamfer1_piece_28a, bisect_by=Plane(origin=(10, 0.12723725, 3.585514254), z_dir=(1, 0, 0)), keep=Keep.TOP, mode=Mode.PRIVATE)
    with BuildSketch(Plane(origin=(10, 0, 4.828673195), x_dir=(-0.027495876610587326, 0.9996219169112966, 0), z_dir=(0, 0, -1))) as chamfer1_piece_28b_section:
        with BuildLine():
            Line((0.411469278, 0), (-0.022618862, 0.410847117))
            Line((-0.022618862, 0.410847117), (-0.030615837, 0.41062715))
            ThreePointArc((-0.030615837, 0.41062715), (-0.013651691, 0.205359132), (-0.007996975, -0.000219967))
            Line((-0.007996975, -0.000219967), (0.000219967, -0.007996975))
            ThreePointArc((0.000219967, -0.007996975), (0.205799066, -0.00234226), (0.411689245, -0.007996975))
            Line((0.411689245, -0.007996975), (0.411469278, 0))
        make_face()
    chamfer1_piece_28b = extrude(amount=1.828673195, mode=Mode.PRIVATE)
    chamfer1_piece_28b = split(chamfer1_piece_28b, bisect_by=Plane(origin=(9.848335675, 0.12723725, 3.951664325), z_dir=(0.7071067811865437, 0, 0.7071067811865513)), keep=Keep.TOP, mode=Mode.PRIVATE)
    chamfer1_piece_28 = chamfer1_piece_28a & chamfer1_piece_28b
    add(chamfer1_piece_28, mode=Mode.SUBTRACT)
    with BuildSketch(Plane(origin=(-8.492618208, 0, 5.307381792), x_dir=(0.019442520806011977, 0.9996219169112968, -0.019442520806012123), z_dir=(-0.7071067811865501, 0, -0.7071067811865449))) as chamfer1_piece_29a_section:
        with BuildLine():
            Line((0.411469278, 0), (-0.022618862, -0.410847117))
            Line((-0.022618862, -0.410847117), (-0.030615837, -0.41062715))
            ThreePointArc((-0.030615837, -0.41062715), (-0.013651691, -0.205359132), (-0.007996975, 0.000219967))
            Line((-0.007996975, 0.000219967), (0.000219967, 0.007996975))
            ThreePointArc((0.000219967, 0.007996975), (0.205799066, 0.00234226), (0.411689245, 0.007996975))
            Line((0.411689245, 0.007996975), (0.411469278, 0))
        make_face()
    chamfer1_piece_29a = extrude(amount=3.160432969, mode=Mode.PRIVATE)
    chamfer1_piece_29a = split(chamfer1_piece_29a, bisect_by=Plane(origin=(-10, 0.12723725, 3.585514254), z_dir=(-1, 0, 0)), keep=Keep.TOP, mode=Mode.PRIVATE)
    with BuildSketch(Plane(origin=(-10, 0, 4.828673195), x_dir=(0.02749587661058735, 0.9996219169112966, 0), z_dir=(0, 0, -1))) as chamfer1_piece_29b_section:
        with BuildLine():
            Line((0.411469278, 0), (-0.022618862, -0.410847117))
            Line((-0.022618862, -0.410847117), (-0.030615837, -0.41062715))
            ThreePointArc((-0.030615837, -0.41062715), (-0.013651691, -0.205359132), (-0.007996975, 0.000219967))
            Line((-0.007996975, 0.000219967), (0.000219967, 0.007996975))
            ThreePointArc((0.000219967, 0.007996975), (0.205799066, 0.00234226), (0.411689245, 0.007996975))
            Line((0.411689245, 0.007996975), (0.411469278, 0))
        make_face()
    chamfer1_piece_29b = extrude(amount=1.828673195, mode=Mode.PRIVATE)
    chamfer1_piece_29b = split(chamfer1_piece_29b, bisect_by=Plane(origin=(-9.848335675, 0.12723725, 3.951664325), z_dir=(-0.7071067811865449, 0, 0.7071067811865501)), keep=Keep.TOP, mode=Mode.PRIVATE)
    chamfer1_piece_29 = chamfer1_piece_29a & chamfer1_piece_29b
    add(chamfer1_piece_29, mode=Mode.SUBTRACT)
    with BuildSketch(Plane(origin=(7.528673195, 12, -3), x_dir=(0, -0.9996219169112968, 0.027495876610586226), z_dir=(-1, 0, 0))) as chamfer1_piece_30a_section:
        with BuildLine():
            Line((0.411469278, 0), (-0.022618862, -0.410847117))
            Line((-0.022618862, -0.410847117), (-0.030615837, -0.41062715))
            ThreePointArc((-0.030615837, -0.41062715), (-0.013651691, -0.205359132), (-0.007996975, 0.000219967))
            Line((-0.007996975, 0.000219967), (0.000219967, 0.007996975))
            ThreePointArc((0.000219967, 0.007996975), (0.205799066, 0.00234226), (0.411689245, 0.007996975))
            Line((0.411689245, 0.007996975), (0.411469278, 0))
        make_face()
    chamfer1_piece_30a = extrude(amount=14.028673195, mode=Mode.PRIVATE)
    chamfer1_piece_30a = split(chamfer1_piece_30a, bisect_by=Plane(origin=(6.5, 11.868082549, -3.131917451), z_dir=(1, 0, 0)), keep=Keep.TOP, mode=Mode.PRIVATE)
    with BuildSketch(Plane(origin=(6.5, 12, 4.028673195), x_dir=(-0.027495876610587302, -0.9996219169112966, 0), z_dir=(0, 0, -1))) as chamfer1_piece_30b_section:
        with BuildLine():
            Line((0.411469278, 0), (-0.022618862, -0.410847117))
            Line((-0.022618862, -0.410847117), (-0.030615837, -0.41062715))
            ThreePointArc((-0.030615837, -0.41062715), (-0.013651691, -0.205359132), (-0.007996975, 0.000219967))
            Line((-0.007996975, 0.000219967), (0.000219967, 0.007996975))
            ThreePointArc((0.000219967, 0.007996975), (0.205799066, 0.00234226), (0.411689245, 0.007996975))
            Line((0.411689245, 0.007996975), (0.411469278, 0))
        make_face()
    chamfer1_piece_30b = extrude(amount=8.05734639, mode=Mode.PRIVATE)
    chamfer1_piece_30b = split(chamfer1_piece_30b, bisect_by=Plane(origin=(6.631917451, 11.868082549, -3), z_dir=(0, 0, -1)), keep=Keep.TOP, mode=Mode.PRIVATE)
    chamfer1_piece_30 = chamfer1_piece_30a & chamfer1_piece_30b
    add(chamfer1_piece_30, mode=Mode.SUBTRACT)
    with BuildSketch(Plane(origin=(-6.5, 12, -4.028673195), x_dir=(0.027495876610587302, -0.9996219169112966, 0), z_dir=(0, 0, 1))) as chamfer1_piece_31a_section:
        with BuildLine():
            Line((0.411469278, 0), (-0.022618862, -0.410847117))
            Line((-0.022618862, -0.410847117), (-0.030615837, -0.41062715))
            ThreePointArc((-0.030615837, -0.41062715), (-0.013651691, -0.205359132), (-0.007996975, 0.000219967))
            Line((-0.007996975, 0.000219967), (0.000219967, 0.007996975))
            ThreePointArc((0.000219967, 0.007996975), (0.205799066, 0.00234226), (0.411689245, 0.007996975))
            Line((0.411689245, 0.007996975), (0.411469278, 0))
        make_face()
    chamfer1_piece_31a = extrude(amount=8.05734639, mode=Mode.PRIVATE)
    chamfer1_piece_31a = split(chamfer1_piece_31a, bisect_by=Plane(origin=(-6.631917451, 11.868082549, -3), z_dir=(0, 0, -1)), keep=Keep.TOP, mode=Mode.PRIVATE)
    with BuildSketch(Plane(origin=(6.5, 12, -3), x_dir=(0, -0.9996219169112968, 0.027495876610586226), z_dir=(-1, 0, 0))) as chamfer1_piece_31b_section:
        with BuildLine():
            Line((0.411469278, 0), (-0.022618862, -0.410847117))
            Line((-0.022618862, -0.410847117), (-0.030615837, -0.41062715))
            ThreePointArc((-0.030615837, -0.41062715), (-0.013651691, -0.205359132), (-0.007996975, 0.000219967))
            Line((-0.007996975, 0.000219967), (0.000219967, 0.007996975))
            ThreePointArc((0.000219967, 0.007996975), (0.205799066, 0.00234226), (0.411689245, 0.007996975))
            Line((0.411689245, 0.007996975), (0.411469278, 0))
        make_face()
    chamfer1_piece_31b = extrude(amount=14.028673195, mode=Mode.PRIVATE)
    chamfer1_piece_31b = split(chamfer1_piece_31b, bisect_by=Plane(origin=(-6.5, 11.868082549, -3.131917451), z_dir=(-1, 0, 0)), keep=Keep.TOP, mode=Mode.PRIVATE)
    chamfer1_piece_31 = chamfer1_piece_31a & chamfer1_piece_31b
    add(chamfer1_piece_31, mode=Mode.SUBTRACT)
    with BuildSketch(Plane(origin=(8.971326805, 6, -5), x_dir=(0, -0.9996219169112966, -0.027495876610587302), z_dir=(1, 0, 0))) as chamfer1_piece_32a_section:
        with BuildLine():
            Line((0.411469278, 0), (-0.022618862, -0.410847117))
            Line((-0.022618862, -0.410847117), (-0.030615837, -0.41062715))
            ThreePointArc((-0.030615837, -0.41062715), (-0.013651691, -0.205359132), (-0.007996975, 0.000219967))
            Line((-0.007996975, 0.000219967), (0.000219967, 0.007996975))
            ThreePointArc((0.000219967, 0.007996975), (0.205799066, 0.00234226), (0.411689245, 0.007996975))
            Line((0.411689245, 0.007996975), (0.411469278, 0))
        make_face()
    chamfer1_piece_32a = extrude(amount=10.05734639, mode=Mode.PRIVATE)
    chamfer1_piece_32a = split(chamfer1_piece_32a, bisect_by=Plane(origin=(10, 5.868082549, -4.868082549), z_dir=(-1, 0, 0)), keep=Keep.TOP, mode=Mode.PRIVATE)
    with BuildSketch(Plane(origin=(10, 4.971326805, -5), x_dir=(-0.9996219169112966, 0, -0.027495876610587302), z_dir=(0, 1, 0))) as chamfer1_piece_32b_section:
        with BuildLine():
            Line((0.411469278, 0), (-0.022618862, 0.410847117))
            Line((-0.022618862, 0.410847117), (-0.030615837, 0.41062715))
            ThreePointArc((-0.030615837, 0.41062715), (-0.013651691, 0.205359132), (-0.007996975, -0.000219967))
            Line((-0.007996975, -0.000219967), (0.000219967, -0.007996975))
            ThreePointArc((0.000219967, -0.007996975), (0.205799066, -0.00234226), (0.411689245, -0.007996975))
            Line((0.411689245, -0.007996975), (0.411469278, 0))
        make_face()
    chamfer1_piece_32b = extrude(amount=8.05734639, mode=Mode.PRIVATE)
    chamfer1_piece_32b = split(chamfer1_piece_32b, bisect_by=Plane(origin=(9.868082549, 6, -4.868082549), z_dir=(0, -1, 0)), keep=Keep.TOP, mode=Mode.PRIVATE)
    chamfer1_piece_32 = chamfer1_piece_32a & chamfer1_piece_32b
    add(chamfer1_piece_32, mode=Mode.SUBTRACT)
    with BuildSketch(Plane(origin=(-10, 4.971326805, -5), x_dir=(-0.027495876610587302, 0, 0.9996219169112966), z_dir=(0, 1, 0))) as chamfer1_piece_33a_section:
        with BuildLine():
            Line((0.411469278, 0), (-0.022618862, 0.410847117))
            Line((-0.022618862, 0.410847117), (-0.030615837, 0.41062715))
            ThreePointArc((-0.030615837, 0.41062715), (-0.013651691, 0.205359132), (-0.007996975, -0.000219967))
            Line((-0.007996975, -0.000219967), (0.000219967, -0.007996975))
            ThreePointArc((0.000219967, -0.007996975), (0.205799066, -0.00234226), (0.411689245, -0.007996975))
            Line((0.411689245, -0.007996975), (0.411469278, 0))
        make_face()
    chamfer1_piece_33a = extrude(amount=8.05734639, mode=Mode.PRIVATE)
    chamfer1_piece_33a = split(chamfer1_piece_33a, bisect_by=Plane(origin=(-9.868082549, 6, -4.868082549), z_dir=(0, -1, 0)), keep=Keep.TOP, mode=Mode.PRIVATE)
    with BuildSketch(Plane(origin=(-19.028673195, 6, -5), x_dir=(0, -0.9996219169112966, -0.027495876610587302), z_dir=(1, 0, 0))) as chamfer1_piece_33b_section:
        with BuildLine():
            Line((0.411469278, 0), (-0.022618862, -0.410847117))
            Line((-0.022618862, -0.410847117), (-0.030615837, -0.41062715))
            ThreePointArc((-0.030615837, -0.41062715), (-0.013651691, -0.205359132), (-0.007996975, 0.000219967))
            Line((-0.007996975, 0.000219967), (0.000219967, 0.007996975))
            ThreePointArc((0.000219967, 0.007996975), (0.205799066, 0.00234226), (0.411689245, 0.007996975))
            Line((0.411689245, 0.007996975), (0.411469278, 0))
        make_face()
    chamfer1_piece_33b = extrude(amount=10.05734639, mode=Mode.PRIVATE)
    chamfer1_piece_33b = split(chamfer1_piece_33b, bisect_by=Plane(origin=(-10, 5.868082549, -4.868082549), z_dir=(1, 0, 0)), keep=Keep.TOP, mode=Mode.PRIVATE)
    chamfer1_piece_33 = chamfer1_piece_33a & chamfer1_piece_33b
    add(chamfer1_piece_33, mode=Mode.SUBTRACT)


solid = part.part
